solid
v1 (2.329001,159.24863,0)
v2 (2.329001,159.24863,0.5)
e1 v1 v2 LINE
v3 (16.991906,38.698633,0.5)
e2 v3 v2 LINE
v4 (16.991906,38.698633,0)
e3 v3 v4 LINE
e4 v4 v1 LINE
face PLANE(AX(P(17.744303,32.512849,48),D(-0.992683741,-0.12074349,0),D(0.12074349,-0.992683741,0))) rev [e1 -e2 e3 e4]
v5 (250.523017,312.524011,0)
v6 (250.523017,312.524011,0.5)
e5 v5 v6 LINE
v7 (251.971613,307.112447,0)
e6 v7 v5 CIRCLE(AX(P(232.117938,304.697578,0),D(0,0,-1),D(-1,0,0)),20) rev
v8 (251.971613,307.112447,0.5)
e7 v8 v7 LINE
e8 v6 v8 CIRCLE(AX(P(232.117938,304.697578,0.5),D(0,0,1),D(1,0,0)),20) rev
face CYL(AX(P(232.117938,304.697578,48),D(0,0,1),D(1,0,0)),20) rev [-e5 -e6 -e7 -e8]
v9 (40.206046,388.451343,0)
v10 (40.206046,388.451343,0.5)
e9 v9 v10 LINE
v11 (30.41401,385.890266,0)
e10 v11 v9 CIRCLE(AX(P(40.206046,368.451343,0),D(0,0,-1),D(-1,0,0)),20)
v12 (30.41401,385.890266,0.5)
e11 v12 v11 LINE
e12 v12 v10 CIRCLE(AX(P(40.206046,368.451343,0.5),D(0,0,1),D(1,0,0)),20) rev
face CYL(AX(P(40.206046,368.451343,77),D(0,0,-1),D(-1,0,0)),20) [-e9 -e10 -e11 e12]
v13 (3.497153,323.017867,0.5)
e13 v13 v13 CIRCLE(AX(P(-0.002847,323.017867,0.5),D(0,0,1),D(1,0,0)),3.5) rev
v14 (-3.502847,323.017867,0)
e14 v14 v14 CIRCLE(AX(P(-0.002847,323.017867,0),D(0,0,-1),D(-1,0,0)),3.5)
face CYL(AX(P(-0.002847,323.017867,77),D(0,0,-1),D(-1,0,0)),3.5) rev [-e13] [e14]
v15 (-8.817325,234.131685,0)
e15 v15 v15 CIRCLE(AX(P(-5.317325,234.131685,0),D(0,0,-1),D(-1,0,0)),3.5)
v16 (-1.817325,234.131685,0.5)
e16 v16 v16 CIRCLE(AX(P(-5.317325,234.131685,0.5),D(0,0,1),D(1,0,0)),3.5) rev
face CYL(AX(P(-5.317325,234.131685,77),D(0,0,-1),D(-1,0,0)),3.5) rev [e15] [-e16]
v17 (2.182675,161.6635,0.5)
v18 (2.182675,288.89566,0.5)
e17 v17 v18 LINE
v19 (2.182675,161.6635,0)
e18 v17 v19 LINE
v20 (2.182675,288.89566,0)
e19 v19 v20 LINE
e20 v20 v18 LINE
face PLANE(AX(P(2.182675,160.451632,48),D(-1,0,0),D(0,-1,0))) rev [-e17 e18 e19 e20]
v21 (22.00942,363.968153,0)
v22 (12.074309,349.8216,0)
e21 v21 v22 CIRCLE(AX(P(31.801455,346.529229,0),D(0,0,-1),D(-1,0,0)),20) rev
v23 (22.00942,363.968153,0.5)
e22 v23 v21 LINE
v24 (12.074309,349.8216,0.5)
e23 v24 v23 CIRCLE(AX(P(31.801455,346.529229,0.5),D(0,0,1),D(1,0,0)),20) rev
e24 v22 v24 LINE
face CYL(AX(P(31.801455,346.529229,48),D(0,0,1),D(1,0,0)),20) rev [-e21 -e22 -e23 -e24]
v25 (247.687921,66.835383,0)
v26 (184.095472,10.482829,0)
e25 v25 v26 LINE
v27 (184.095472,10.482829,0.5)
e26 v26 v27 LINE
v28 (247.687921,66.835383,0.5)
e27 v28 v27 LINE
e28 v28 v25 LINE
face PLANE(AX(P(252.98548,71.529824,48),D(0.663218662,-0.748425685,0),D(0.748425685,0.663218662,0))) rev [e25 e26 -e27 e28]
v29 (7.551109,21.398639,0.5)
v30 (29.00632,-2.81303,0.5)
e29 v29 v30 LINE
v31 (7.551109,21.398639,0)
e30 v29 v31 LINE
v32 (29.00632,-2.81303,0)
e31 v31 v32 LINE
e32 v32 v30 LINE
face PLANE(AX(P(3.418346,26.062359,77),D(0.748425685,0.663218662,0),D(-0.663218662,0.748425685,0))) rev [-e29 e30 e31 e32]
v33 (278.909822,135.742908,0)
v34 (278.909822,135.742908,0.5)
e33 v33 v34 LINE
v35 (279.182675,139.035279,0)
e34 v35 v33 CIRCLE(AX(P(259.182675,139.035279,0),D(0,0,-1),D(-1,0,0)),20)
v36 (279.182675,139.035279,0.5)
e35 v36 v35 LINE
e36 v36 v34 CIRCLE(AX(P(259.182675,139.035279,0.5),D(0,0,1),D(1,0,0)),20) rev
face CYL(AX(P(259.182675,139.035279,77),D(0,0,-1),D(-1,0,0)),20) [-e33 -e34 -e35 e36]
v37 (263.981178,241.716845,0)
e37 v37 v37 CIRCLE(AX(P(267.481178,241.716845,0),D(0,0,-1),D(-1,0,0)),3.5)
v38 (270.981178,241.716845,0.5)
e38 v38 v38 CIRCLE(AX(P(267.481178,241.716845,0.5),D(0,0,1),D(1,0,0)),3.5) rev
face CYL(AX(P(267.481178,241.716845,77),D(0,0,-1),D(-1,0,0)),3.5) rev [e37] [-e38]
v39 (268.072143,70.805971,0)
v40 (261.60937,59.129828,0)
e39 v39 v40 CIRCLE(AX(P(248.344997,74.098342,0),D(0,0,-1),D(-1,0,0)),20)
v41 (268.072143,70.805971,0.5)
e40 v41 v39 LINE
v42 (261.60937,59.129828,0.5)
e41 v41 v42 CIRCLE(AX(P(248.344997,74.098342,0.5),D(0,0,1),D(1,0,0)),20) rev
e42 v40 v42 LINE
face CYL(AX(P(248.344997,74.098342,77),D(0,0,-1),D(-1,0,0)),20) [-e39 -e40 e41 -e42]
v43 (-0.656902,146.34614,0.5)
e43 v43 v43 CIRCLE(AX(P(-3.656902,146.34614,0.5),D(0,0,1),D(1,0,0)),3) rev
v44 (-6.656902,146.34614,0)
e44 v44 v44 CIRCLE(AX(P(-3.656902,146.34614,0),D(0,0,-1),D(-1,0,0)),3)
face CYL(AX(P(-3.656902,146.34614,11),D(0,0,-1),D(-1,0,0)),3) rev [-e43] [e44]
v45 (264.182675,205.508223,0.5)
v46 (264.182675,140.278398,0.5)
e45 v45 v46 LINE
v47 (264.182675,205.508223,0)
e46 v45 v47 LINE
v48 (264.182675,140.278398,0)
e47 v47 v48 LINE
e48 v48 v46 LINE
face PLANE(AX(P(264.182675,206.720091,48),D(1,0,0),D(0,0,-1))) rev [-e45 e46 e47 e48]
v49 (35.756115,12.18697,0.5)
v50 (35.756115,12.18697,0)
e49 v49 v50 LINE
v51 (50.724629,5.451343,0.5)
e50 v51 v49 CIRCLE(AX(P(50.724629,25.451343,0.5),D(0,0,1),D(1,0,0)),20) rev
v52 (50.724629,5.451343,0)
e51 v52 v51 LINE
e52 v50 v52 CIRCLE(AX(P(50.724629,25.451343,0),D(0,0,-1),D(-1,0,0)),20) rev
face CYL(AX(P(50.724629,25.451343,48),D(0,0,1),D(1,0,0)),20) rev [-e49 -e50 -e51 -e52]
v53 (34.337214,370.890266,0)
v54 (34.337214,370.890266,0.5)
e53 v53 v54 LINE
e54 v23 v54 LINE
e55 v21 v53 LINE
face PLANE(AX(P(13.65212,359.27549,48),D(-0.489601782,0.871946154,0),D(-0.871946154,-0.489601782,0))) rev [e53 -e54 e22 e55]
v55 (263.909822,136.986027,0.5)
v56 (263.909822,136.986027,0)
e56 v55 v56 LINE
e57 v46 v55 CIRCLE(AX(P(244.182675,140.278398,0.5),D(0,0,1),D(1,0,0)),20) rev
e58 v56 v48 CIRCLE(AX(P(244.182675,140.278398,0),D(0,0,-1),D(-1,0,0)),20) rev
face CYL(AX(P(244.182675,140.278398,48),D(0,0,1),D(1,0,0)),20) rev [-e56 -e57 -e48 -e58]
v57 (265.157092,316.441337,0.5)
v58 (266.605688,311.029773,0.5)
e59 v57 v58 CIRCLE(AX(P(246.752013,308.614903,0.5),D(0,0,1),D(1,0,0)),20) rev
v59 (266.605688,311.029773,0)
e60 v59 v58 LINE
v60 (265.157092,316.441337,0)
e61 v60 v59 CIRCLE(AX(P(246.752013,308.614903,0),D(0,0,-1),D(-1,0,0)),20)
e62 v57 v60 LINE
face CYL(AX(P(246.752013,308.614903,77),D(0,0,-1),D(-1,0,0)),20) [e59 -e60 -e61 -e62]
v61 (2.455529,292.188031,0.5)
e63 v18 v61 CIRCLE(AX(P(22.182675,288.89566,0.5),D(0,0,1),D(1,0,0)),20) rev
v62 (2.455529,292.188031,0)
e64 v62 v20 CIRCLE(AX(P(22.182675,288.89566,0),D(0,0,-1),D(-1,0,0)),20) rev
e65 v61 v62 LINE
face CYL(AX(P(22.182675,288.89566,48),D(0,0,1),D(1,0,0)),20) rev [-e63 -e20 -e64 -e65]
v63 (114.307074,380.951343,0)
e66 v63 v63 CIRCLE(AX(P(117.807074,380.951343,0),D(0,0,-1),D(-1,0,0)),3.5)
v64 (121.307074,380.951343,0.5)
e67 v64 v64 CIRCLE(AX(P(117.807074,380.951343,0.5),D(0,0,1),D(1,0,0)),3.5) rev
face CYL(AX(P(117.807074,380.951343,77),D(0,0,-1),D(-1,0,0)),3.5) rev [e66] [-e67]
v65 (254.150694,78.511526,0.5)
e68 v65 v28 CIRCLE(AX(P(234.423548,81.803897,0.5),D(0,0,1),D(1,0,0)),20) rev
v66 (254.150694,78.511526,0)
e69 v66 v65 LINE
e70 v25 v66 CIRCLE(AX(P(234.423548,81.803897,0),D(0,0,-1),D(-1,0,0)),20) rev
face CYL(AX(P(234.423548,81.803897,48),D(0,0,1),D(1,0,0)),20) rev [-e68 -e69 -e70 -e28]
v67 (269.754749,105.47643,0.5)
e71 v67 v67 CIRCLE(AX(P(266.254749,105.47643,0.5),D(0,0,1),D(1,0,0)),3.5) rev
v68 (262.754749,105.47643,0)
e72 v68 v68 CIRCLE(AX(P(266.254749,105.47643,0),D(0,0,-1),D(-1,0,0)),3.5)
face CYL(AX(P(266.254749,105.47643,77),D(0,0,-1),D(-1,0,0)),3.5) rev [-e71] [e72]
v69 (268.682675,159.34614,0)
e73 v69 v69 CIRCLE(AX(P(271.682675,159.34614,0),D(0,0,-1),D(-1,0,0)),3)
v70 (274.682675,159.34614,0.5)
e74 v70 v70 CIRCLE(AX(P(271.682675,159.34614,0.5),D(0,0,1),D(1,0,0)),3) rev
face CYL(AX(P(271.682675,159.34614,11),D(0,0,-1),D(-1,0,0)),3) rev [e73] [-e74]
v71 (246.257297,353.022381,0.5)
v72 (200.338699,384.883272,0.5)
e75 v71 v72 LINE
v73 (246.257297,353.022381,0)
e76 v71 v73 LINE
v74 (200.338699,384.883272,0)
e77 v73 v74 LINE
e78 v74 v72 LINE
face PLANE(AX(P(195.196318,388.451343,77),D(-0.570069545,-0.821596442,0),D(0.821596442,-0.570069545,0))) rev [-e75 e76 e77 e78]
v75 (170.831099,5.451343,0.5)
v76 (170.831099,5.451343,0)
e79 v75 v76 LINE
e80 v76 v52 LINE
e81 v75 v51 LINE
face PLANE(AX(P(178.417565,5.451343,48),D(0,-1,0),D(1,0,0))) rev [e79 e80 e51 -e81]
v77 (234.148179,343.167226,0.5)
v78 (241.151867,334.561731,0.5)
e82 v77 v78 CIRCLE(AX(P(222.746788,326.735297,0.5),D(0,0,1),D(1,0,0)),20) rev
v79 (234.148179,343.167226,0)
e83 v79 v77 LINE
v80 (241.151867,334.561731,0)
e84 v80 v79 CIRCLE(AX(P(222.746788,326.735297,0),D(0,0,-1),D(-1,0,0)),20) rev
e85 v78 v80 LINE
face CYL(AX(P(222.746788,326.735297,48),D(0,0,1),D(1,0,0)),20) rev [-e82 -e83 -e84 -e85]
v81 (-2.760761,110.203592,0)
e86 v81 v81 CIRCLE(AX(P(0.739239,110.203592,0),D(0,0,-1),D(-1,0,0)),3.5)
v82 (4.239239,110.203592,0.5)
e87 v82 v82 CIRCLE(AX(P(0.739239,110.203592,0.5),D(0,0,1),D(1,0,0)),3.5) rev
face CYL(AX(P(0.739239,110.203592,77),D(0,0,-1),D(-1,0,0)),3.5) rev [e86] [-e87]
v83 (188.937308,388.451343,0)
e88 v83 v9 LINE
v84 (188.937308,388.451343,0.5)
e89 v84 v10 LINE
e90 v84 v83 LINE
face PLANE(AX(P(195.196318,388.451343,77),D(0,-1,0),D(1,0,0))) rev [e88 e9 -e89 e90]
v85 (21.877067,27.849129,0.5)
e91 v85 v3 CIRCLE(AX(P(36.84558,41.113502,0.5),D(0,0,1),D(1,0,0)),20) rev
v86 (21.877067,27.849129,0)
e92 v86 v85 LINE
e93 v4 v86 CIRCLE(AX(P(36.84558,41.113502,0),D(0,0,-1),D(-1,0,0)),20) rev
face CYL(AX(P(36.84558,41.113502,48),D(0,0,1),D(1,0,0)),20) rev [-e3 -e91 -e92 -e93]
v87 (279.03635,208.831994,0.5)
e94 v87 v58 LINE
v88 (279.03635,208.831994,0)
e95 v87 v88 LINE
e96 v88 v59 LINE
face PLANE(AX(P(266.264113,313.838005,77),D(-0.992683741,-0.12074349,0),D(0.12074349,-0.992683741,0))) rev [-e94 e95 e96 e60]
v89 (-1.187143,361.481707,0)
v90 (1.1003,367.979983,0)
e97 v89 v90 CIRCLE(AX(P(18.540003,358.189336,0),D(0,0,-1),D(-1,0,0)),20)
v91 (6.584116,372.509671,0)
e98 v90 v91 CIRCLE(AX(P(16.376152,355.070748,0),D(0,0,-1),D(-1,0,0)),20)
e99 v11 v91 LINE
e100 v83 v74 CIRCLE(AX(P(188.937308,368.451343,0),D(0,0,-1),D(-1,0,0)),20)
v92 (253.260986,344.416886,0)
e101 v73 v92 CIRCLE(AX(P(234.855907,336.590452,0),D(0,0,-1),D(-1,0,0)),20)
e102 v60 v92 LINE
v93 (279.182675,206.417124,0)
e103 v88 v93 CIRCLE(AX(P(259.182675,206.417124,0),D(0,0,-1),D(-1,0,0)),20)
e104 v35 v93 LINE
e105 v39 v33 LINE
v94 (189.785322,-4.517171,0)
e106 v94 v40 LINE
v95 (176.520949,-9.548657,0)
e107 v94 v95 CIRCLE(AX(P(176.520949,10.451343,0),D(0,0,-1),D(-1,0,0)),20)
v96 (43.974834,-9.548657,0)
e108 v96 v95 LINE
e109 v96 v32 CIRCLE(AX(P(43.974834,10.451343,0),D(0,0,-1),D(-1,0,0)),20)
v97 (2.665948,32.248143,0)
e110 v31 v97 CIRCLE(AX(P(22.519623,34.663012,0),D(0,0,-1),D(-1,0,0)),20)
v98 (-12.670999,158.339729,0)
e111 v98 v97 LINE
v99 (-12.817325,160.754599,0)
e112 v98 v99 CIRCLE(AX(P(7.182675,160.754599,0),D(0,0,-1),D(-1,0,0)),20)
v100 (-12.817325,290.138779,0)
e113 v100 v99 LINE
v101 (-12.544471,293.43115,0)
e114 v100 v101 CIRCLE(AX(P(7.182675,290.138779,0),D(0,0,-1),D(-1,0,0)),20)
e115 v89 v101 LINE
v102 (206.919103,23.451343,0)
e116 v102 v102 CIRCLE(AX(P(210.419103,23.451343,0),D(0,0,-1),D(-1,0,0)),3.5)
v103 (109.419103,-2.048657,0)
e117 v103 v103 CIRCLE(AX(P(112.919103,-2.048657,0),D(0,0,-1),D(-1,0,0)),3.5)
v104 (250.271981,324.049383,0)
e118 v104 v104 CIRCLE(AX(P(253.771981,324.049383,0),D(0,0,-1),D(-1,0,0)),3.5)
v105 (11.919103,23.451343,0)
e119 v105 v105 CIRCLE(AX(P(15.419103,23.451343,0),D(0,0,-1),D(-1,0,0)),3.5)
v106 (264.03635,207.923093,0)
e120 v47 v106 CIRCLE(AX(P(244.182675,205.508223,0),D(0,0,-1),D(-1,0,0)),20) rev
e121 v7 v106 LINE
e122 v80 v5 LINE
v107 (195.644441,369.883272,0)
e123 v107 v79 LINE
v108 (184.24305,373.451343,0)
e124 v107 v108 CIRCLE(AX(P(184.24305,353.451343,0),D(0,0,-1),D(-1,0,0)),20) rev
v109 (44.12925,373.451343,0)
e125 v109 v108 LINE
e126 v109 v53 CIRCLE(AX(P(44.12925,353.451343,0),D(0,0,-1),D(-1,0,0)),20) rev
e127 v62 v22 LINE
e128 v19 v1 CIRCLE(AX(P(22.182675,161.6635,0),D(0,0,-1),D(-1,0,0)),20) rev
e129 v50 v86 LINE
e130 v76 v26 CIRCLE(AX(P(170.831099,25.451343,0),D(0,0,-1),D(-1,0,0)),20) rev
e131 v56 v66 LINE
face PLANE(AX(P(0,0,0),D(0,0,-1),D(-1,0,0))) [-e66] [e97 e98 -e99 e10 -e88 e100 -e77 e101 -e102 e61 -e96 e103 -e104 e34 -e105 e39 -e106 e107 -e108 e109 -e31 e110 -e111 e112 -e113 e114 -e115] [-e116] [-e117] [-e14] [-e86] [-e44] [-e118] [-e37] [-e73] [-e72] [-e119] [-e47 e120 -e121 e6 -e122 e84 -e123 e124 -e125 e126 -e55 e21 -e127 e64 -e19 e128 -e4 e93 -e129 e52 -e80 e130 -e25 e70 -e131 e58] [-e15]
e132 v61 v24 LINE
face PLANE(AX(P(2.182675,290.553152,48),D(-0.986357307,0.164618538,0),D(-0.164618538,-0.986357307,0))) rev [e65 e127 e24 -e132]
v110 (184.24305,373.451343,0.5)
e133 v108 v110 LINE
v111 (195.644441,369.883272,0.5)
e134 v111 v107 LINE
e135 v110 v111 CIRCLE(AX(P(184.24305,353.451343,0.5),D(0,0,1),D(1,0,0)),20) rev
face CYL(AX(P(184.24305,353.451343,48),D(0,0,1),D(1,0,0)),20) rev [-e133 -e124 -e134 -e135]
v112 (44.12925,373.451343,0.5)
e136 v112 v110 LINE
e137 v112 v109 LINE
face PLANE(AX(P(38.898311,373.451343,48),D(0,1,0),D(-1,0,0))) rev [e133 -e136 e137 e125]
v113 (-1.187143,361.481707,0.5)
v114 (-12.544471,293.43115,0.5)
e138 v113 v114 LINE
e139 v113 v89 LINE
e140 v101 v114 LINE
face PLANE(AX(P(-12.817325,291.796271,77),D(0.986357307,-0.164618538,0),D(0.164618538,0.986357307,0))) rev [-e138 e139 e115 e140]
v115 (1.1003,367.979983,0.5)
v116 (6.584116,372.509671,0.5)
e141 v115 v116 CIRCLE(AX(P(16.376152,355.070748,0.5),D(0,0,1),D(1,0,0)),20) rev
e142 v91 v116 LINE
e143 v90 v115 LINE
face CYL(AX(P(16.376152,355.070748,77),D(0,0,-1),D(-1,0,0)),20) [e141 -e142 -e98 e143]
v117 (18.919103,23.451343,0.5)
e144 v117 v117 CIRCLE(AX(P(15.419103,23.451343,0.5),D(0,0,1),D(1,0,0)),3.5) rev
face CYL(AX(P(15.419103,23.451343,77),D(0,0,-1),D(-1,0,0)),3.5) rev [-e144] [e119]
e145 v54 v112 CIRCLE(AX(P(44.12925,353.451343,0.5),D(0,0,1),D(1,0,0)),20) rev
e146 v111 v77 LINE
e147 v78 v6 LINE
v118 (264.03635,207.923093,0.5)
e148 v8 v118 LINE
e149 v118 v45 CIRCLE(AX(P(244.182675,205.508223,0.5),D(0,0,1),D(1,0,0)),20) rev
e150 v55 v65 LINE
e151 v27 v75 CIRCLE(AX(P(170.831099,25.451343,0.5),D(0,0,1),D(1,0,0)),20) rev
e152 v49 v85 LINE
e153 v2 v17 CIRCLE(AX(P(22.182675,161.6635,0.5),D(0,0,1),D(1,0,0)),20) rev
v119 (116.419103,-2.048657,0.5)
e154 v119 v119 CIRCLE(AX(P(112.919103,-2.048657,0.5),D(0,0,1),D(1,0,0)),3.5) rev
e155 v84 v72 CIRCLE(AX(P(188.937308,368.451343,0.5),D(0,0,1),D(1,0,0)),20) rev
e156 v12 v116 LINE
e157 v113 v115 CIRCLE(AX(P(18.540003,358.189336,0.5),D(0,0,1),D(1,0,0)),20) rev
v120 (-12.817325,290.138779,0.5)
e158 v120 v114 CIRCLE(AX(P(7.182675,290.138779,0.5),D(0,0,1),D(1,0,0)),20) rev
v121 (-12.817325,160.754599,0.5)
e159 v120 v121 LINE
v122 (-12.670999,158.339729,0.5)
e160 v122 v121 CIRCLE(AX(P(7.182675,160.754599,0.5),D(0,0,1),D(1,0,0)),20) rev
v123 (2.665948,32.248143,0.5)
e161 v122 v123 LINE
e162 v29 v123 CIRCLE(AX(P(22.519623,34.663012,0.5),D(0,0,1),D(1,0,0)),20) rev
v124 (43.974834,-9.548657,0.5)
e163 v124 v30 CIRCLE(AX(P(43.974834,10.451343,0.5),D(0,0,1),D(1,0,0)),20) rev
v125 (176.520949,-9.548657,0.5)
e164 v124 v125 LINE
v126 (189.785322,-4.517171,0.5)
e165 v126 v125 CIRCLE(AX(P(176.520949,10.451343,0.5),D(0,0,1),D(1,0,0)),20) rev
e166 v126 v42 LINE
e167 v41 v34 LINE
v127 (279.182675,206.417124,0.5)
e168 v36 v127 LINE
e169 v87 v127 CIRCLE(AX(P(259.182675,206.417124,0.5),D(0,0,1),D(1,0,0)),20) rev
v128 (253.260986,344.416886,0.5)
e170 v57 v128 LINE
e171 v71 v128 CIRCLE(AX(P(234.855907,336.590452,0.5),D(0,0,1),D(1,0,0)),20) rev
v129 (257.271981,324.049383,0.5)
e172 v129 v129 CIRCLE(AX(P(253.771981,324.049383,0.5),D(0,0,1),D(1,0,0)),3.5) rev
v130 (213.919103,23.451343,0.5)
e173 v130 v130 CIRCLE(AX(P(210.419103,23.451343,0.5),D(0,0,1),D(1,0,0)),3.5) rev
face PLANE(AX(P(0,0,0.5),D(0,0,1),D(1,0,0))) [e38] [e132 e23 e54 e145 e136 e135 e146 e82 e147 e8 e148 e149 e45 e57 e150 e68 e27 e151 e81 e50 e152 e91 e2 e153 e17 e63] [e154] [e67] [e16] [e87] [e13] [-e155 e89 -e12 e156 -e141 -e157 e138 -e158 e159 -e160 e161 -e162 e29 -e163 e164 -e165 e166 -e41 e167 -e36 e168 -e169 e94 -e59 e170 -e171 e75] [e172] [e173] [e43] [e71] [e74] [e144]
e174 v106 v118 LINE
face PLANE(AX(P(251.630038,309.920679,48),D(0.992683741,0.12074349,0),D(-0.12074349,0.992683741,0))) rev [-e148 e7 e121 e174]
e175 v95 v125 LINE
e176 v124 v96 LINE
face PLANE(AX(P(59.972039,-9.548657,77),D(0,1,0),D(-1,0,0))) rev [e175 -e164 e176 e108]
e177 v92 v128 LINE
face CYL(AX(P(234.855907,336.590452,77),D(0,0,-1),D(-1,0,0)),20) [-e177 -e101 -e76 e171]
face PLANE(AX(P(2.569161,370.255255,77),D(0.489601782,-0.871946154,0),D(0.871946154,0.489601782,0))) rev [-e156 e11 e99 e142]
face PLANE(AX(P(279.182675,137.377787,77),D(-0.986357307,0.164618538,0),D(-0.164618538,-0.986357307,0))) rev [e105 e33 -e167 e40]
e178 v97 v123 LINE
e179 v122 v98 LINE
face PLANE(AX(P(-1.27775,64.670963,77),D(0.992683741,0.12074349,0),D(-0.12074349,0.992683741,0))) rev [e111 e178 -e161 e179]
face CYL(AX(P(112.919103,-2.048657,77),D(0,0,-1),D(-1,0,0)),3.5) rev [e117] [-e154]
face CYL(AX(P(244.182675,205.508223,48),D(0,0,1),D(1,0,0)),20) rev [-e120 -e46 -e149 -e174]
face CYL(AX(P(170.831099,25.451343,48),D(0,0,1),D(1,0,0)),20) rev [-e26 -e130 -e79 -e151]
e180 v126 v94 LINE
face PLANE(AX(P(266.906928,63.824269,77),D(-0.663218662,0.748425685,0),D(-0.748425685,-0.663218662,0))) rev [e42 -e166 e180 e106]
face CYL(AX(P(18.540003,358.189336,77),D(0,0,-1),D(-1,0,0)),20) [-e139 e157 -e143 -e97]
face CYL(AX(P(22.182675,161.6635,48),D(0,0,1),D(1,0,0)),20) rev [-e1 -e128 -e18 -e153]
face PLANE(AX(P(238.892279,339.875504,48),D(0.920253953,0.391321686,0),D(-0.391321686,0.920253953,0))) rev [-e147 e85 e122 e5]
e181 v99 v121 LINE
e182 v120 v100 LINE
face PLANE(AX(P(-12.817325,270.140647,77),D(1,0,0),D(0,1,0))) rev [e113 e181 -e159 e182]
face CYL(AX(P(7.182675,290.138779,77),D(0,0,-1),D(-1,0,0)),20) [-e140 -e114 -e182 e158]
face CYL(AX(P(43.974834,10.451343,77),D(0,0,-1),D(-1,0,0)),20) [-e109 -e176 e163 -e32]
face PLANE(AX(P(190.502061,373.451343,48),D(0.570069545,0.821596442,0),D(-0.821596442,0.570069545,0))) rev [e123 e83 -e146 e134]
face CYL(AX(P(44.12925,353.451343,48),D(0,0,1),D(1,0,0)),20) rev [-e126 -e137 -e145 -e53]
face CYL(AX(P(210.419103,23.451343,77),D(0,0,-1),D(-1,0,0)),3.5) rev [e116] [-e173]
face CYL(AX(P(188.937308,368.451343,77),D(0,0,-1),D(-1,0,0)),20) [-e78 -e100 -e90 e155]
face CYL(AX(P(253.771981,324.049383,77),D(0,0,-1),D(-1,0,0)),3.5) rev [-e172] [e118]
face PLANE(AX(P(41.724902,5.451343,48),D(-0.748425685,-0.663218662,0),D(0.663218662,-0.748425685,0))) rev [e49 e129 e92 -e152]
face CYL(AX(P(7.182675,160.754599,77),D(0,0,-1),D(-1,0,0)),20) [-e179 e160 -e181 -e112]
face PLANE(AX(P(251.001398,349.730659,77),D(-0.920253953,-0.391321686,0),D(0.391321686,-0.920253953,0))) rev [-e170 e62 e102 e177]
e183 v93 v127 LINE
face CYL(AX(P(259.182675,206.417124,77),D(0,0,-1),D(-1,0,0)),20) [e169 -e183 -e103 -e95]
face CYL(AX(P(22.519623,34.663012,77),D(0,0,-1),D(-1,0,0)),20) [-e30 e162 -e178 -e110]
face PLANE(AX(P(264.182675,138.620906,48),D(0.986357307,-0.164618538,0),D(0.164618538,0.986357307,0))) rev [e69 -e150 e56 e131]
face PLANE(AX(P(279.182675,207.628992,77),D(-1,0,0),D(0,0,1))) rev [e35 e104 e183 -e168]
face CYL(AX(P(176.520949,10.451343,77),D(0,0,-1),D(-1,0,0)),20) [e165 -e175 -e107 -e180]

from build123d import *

# Parameters (mm, degrees)
ESTRUSIONE_ESTRUSIONE1_DEPTH         = 77
SCHIZZO2_R                           = 50
SCHIZZO2_R_2                         = 36
SCHIZZO2_R_3                         = 26
TAGLIO_ESTRUSIONE1_DEPTH             = 485.526998211
TAGLIO_ESTRUSIONE2_DEPTH             = 48
FORO_FILETTATO_M8_1_D                = 6.8
FORO_FILETTATO_M8_1_DEPTH            = 23
FORO_FILETTATO_M8_1_CSINK_D          = 8.05
FORO_FILETTATO_M8_1_CSINK_ANGLE      = 90
FORO_FILETTATO_M8_1_TIP              = 2.042926105
SCHIZZO10_R                          = 3.5
TAGLIO_ESTRUSIONE3_DEPTH             = 485.526998211
RACCORDO1_R                          = 20
RACCORDO2_R                          = 2
ESTRUSIONE_ESTRUSIONE2_START         = -4.5
SCHIZZO11_R                          = 50
SCHIZZO11_R_2                        = 43
ESTRUSIONE_ESTRUSIONE2_DEPTH         = 4.5
ESTRUSIONE_ESTRUSIONE4_START         = 5
SCHIZZO12_R                          = 33.5
ESTRUSIONE_ESTRUSIONE4_DEPTH         = 6
ESTRUSIONE_ESTRUSIONE5_START         = -4
SCHIZZO13_R                          = 26
SCHIZZO13_R_2                        = 23
ESTRUSIONE_ESTRUSIONE5_DEPTH         = 4
SCHIZZO15_R                          = 3
TAGLIO_ESTRUSIONE4_DEPTH             = 11
RACCORDO4_R                          = 20
FORO_FILETTATO_M20X1_5_1_D           = 18.5
FORO_FILETTATO_M20X1_5_1_DEPTH       = 44.5
FORO_FILETTATO_M20X1_5_1_CSINK_D     = 20.05
FORO_FILETTATO_M20X1_5_1_CSINK_ANGLE = 90
FORO_FILETTATO_M20X1_5_1_TIP         = 5.557960726
FORO_FILETTATO_G1_2_1_D              = 19
FORO_FILETTATO_G1_2_1_DEPTH          = 15
FORO_FILETTATO_G1_2_1_CSINK_D        = 21.005
FORO_FILETTATO_G1_2_1_CSINK_ANGLE    = 90
FORO_FILETTATO_M20X1_5_3_D           = 18.5
FORO_FILETTATO_M20X1_5_3_CSINK_D     = 20.05
FORO_FILETTATO_M20X1_5_3_CSINK_ANGLE = 90
RACCORDO6_R                          = 4
SCHIZZO24_W                          = 424.699843927
SCHIZZO24_H                          = 472.863672624
TAGLIO_ESTRUSIONE8_DEPTH             = 76.5


with BuildPart() as part:
    # Schizzo1 → Estrusione-Estrusione1 (new body)
    with BuildSketch(Plane.XY):
        Polygon((59.972038663, -9.548657155), (184.107415497, -9.548657155), (266.906928499, 63.824268584), (279.182675389, 137.377787042), (279.182675389, 207.628992193), (266.264112981, 313.83800459), (251.001397802, 349.730658864), (195.196318474, 388.451342845), (34.975107006, 388.451342845), (2.569160579, 370.255254654), (-0.4487972, 365.905709245), (-12.817324611, 291.796270746), (-12.817324611, 270.140647245), (-12.817324611, 159.542730711), (-8.096788353, 120.733188436), (-1.277749696, 64.670962751), (3.418345685, 26.062359347), (34.975107006, -9.548657155), align=None)
    extrude(amount=ESTRUSIONE_ESTRUSIONE1_DEPTH)

    # Schizzo2 → Taglio-Estrusione1 (cut, through all)
    with BuildSketch(Plane.XY.offset(77)):
        with Locations((119.182675389, 251.951342845)):
            Circle(SCHIZZO2_R)
        with Locations((227.185755277, 174.346140283)):
            Circle(SCHIZZO2_R_2)
        with Locations((119.182675389, 109.451342845)):
            Circle(SCHIZZO2_R_3)
    extrude(amount=-TAGLIO_ESTRUSIONE1_DEPTH, mode=Mode.SUBTRACT)

    # Schizzo4 → Taglio-Estrusione2 (cut)
    with BuildSketch(Plane(origin=(0, 0, 0), x_dir=(-1, 0, 0), z_dir=(0, 0, -1))):
        Polygon((-190.502060744, 373.451342845), (-238.892279388, 339.875503756), (-251.63003789, 309.920678761), (-264.182675389, 206.720091138), (-264.182675389, 138.620905818), (-252.98547965, 71.529823638), (-178.417565472, 5.451342845), (-41.724902169, 5.451342845), (-17.744303444, 32.512849195), (-2.182675389, 160.451631766), (-2.182675389, 290.55315197), (-13.652120373, 359.275490486), (-38.898311054, 373.451342845), align=None)
    extrude(amount=-TAGLIO_ESTRUSIONE2_DEPTH, mode=Mode.SUBTRACT)

    # Foro filettato M8-1
    with Locations(Plane(origin=(119.182675389, 309.951342845, 77), x_dir=(1, 0, 0), z_dir=(0, 0, 1))):
        with Locations((0, 0), (-50.22947342, -87), (50.229473419, -87), (63.003079888, -135.605202562), (130.503079888, -96.634059392), (130.503079888, -174.576345732), (0, -165.5), (-30.310889133, -218), (30.310889132, -218)):
            CounterSinkHole(FORO_FILETTATO_M8_1_D / 2, FORO_FILETTATO_M8_1_CSINK_D / 2, depth=FORO_FILETTATO_M8_1_DEPTH, counter_sink_angle=FORO_FILETTATO_M8_1_CSINK_ANGLE)
            with Locations((0, 0, -(FORO_FILETTATO_M8_1_DEPTH + FORO_FILETTATO_M8_1_TIP / 2))):  # 118° drill point
                Cone(0, FORO_FILETTATO_M8_1_D / 2, FORO_FILETTATO_M8_1_TIP, mode=Mode.SUBTRACT)

    # Schizzo10 → Taglio-Estrusione3 (cut, through all)
    with BuildSketch(Plane(origin=(0, 0, 0), x_dir=(-1, 0, 0), z_dir=(0, 0, -1))):
        with Locations((-117.807073551, 380.951342845)):
            Circle(SCHIZZO10_R)
        with Locations((-253.771981004, 324.049383053)):
            Circle(SCHIZZO10_R)
        with Locations((5.317324611, 234.131684501)):
            Circle(SCHIZZO10_R)
        with Locations((-266.254748996, 105.476430494)):
            Circle(SCHIZZO10_R)
        with Locations((-0.739238535, 110.203591991)):
            Circle(SCHIZZO10_R)
        with Locations((-112.919102804, -2.048657155)):
            Circle(SCHIZZO10_R)
        with Locations((0.002847066, 323.017867274)):
            Circle(SCHIZZO10_R)
        with Locations((-267.481177866, 241.716845092)):
            Circle(SCHIZZO10_R)
        with Locations((-210.419102804, 23.451342845)):
            Circle(SCHIZZO10_R)
        with Locations((-15.419102804, 23.451342845)):
            Circle(SCHIZZO10_R)
    extrude(amount=-TAGLIO_ESTRUSIONE3_DEPTH, mode=Mode.SUBTRACT)

    # Raccordo1
    # the kernel refuses this fillet: 20 mm, written as the material it takes off along each edge
    with BuildSketch(Plane(origin=(34.975107006, 388.451342845, -13.077346825), x_dir=(1, 0, 0), z_dir=(0, 0, 1))) as raccordo1_piece_1:
        with BuildLine():
            CenterArc((RACCORDO1_R * 0.261546936495, -RACCORDO1_R), RACCORDO1_R, 90, 29.314411212)
            Line((-RACCORDO1_R * 0.228054845331, -RACCORDO1_R * 0.128053846139), (0, 0))
            Line((0, 0), (RACCORDO1_R * 0.261546936495, 0))
        make_face()
    extrude(amount=103.15469365, mode=Mode.SUBTRACT)
    with BuildSketch(Plane(origin=(2.569160579, 370.255254654, -11.511478705), x_dir=(-0.5700695452044089, -0.821596442075085, 0), z_dir=(0, 0, 1))) as raccordo1_piece_2:
        with BuildLine():
            CenterArc((RACCORDO1_R * 0.230229574105, RACCORDO1_R), RACCORDO1_R, 244.069486706, 25.930513294)
            Line((-RACCORDO1_R * 0.207051218491, RACCORDO1_R * 0.100674970644), (0, 0))
            Line((0, 0), (RACCORDO1_R * 0.230229574105, 0))
        make_face()
    extrude(amount=100.022957411, mode=Mode.SUBTRACT)
    with BuildSketch(Plane(origin=(-0.4487972, 365.905709245, -11.212980636), x_dir=(-0.1646185376039717, -0.9863573070024523, 0), z_dir=(0, 0, 1))) as raccordo1_piece_3:
        with BuildLine():
            CenterArc((RACCORDO1_R * 0.224259612729, RACCORDO1_R), RACCORDO1_R, 244.719999772, 25.280000228)
            Line((-RACCORDO1_R * 0.202782643888, RACCORDO1_R * 0.0957683310879), (0, 0))
            Line((0, 0), (RACCORDO1_R * 0.224259612729, 0))
        make_face()
    extrude(amount=99.425961273, mode=Mode.SUBTRACT)
    with BuildSketch(Plane(origin=(-12.817324611, 291.796270746, -4.143729253), x_dir=(0, -1, 0), z_dir=(0, 0, 1))) as raccordo1_piece_4:
        with BuildLine():
            CenterArc((RACCORDO1_R * 0.0828745850626, RACCORDO1_R), RACCORDO1_R, 260.524924734, 9.475075266)
            Line((-RACCORDO1_R * 0.0817439525413, RACCORDO1_R * 0.0136426929975), (0, 0))
            Line((0, 0), (RACCORDO1_R * 0.0828745850626, 0))
        make_face()
    extrude(amount=85.287458506, mode=Mode.SUBTRACT)
    with BuildSketch(Plane(origin=(-12.817324611, 159.542730711, -3.029670184), x_dir=(0.12074349030746913, -0.9926837409509486, 0), z_dir=(0, 0, 1))) as raccordo1_piece_5:
        with BuildLine():
            CenterArc((RACCORDO1_R * 0.0605934036727, RACCORDO1_R), RACCORDO1_R, 263.064986553, 6.935013447)
            Line((-RACCORDO1_R * 0.0601500866348, RACCORDO1_R * 0.00731625904905), (0, 0))
            Line((0, 0), (RACCORDO1_R * 0.0605934036727, 0))
        make_face()
    extrude(amount=83.059340367, mode=Mode.SUBTRACT)
    with BuildSketch(Plane(origin=(3.418345685, 26.062359347, -15.578434173), x_dir=(0.6632186619985212, -0.7484256852733552, 0), z_dir=(0, 0, 1))) as raccordo1_piece_6:
        with BuildLine():
            CenterArc((RACCORDO1_R * 0.311568683461, RACCORDO1_R), RACCORDO1_R, 235.389202752, 34.610797248)
            Line((-RACCORDO1_R * 0.256430169524, RACCORDO1_R * 0.176970654832), (0, 0))
            Line((0, 0), (RACCORDO1_R * 0.311568683461, 0))
        make_face()
    extrude(amount=108.156868346, mode=Mode.SUBTRACT)
    with BuildSketch(Plane(origin=(34.975107006, -9.548657155, -22.499317209), x_dir=(1, 0, 0), z_dir=(0, 0, 1))) as raccordo1_piece_7:
        with BuildLine():
            CenterArc((RACCORDO1_R * 0.449986344173, RACCORDO1_R), RACCORDO1_R, 221.545810695, 48.454189305)
            Line((-RACCORDO1_R * 0.2984393411, RACCORDO1_R * 0.336781338001), (0, 0))
            Line((0, 0), (RACCORDO1_R * 0.449986344173, 0))
        make_face()
    extrude(amount=121.998634417, mode=Mode.SUBTRACT)
    with BuildSketch(Plane(origin=(184.107415497, -9.548657155, -18.966166752), x_dir=(-1, 0, 0), z_dir=(0, 0, 1))) as raccordo1_piece_8:
        with BuildLine():
            CenterArc((RACCORDO1_R * 0.379323335035, -RACCORDO1_R), RACCORDO1_R, 90, 41.545810695)
            Line((-RACCORDO1_R * 0.283895326964, -RACCORDO1_R * 0.251574314727), (0, 0))
            Line((0, 0), (RACCORDO1_R * 0.379323335035, 0))
        make_face()
    extrude(amount=114.932333503, mode=Mode.SUBTRACT)
    with BuildSketch(Plane(origin=(266.906928499, 63.824268584, -17.695673271), x_dir=(-0.7484256852733557, -0.6632186619985205, 0), z_dir=(0, 0, 1))) as raccordo1_piece_9:
        with BuildLine():
            CenterArc((RACCORDO1_R * 0.353913465424, -RACCORDO1_R), RACCORDO1_R, 90, 38.979114039)
            Line((-RACCORDO1_R * 0.275123591744, -RACCORDO1_R * 0.222624684782), (0, 0))
            Line((0, 0), (RACCORDO1_R * 0.353913465424, 0))
        make_face()
    extrude(amount=112.391346542, mode=Mode.SUBTRACT)
    with BuildSketch(Plane(origin=(279.182675389, 137.377787042, -4.143729253), x_dir=(-0.1646185376039625, -0.9863573070024537, 0), z_dir=(0, 0, 1))) as raccordo1_piece_10:
        with BuildLine():
            CenterArc((RACCORDO1_R * 0.0828745850626, -RACCORDO1_R), RACCORDO1_R, 90, 9.475075266)
            Line((-RACCORDO1_R * 0.0817439525413, -RACCORDO1_R * 0.0136426929975), (0, 0))
            Line((0, 0), (RACCORDO1_R * 0.0828745850626, 0))
        make_face()
    extrude(amount=85.287458506, mode=Mode.SUBTRACT)
    with BuildSketch(Plane(origin=(279.182675389, 207.628992193, -3.029670184), x_dir=(0, -1, 0), z_dir=(0, 0, 1))) as raccordo1_piece_11:
        with BuildLine():
            CenterArc((RACCORDO1_R * 0.0605934036727, -RACCORDO1_R), RACCORDO1_R, 90, 6.935013447)
            Line((-RACCORDO1_R * 0.0601500866348, -RACCORDO1_R * 0.00731625904905), (0, 0))
            Line((0, 0), (RACCORDO1_R * 0.0605934036727, 0))
        make_face()
    extrude(amount=83.059340367, mode=Mode.SUBTRACT)
    with BuildSketch(Plane(origin=(266.264112981, 313.83800459, -7.072321183), x_dir=(0.12074349030746688, -0.9926837409509489, 0), z_dir=(0, 0, 1))) as raccordo1_piece_12:
        with BuildLine():
            CenterArc((RACCORDO1_R * 0.141446423652, -RACCORDO1_R), RACCORDO1_R, 90, 16.101750132)
            Line((-RACCORDO1_R * 0.135897577057, -RACCORDO1_R * 0.0392293170219), (0, 0))
            Line((0, 0), (RACCORDO1_R * 0.141446423652, 0))
        make_face()
    extrude(amount=91.144642365, mode=Mode.SUBTRACT)
    with BuildSketch(Plane(origin=(251.001397802, 349.730658864, -14.435616051), x_dir=(0.39132168580287185, -0.9202539531131602, 0), z_dir=(0, 0, 1))) as raccordo1_piece_13:
        with BuildLine():
            CenterArc((RACCORDO1_R * 0.288712321022, -RACCORDO1_R), RACCORDO1_R, 90, 32.208160927)
            Line((-RACCORDO1_R * 0.244284477207, -RACCORDO1_R * 0.153882742714), (0, 0))
            Line((0, 0), (RACCORDO1_R * 0.288712321022, 0))
        make_face()
    extrude(amount=105.871232102, mode=Mode.SUBTRACT)
    with BuildSketch(Plane(origin=(195.196318474, 388.451342845, -15.647525765), x_dir=(0.8215964420750854, -0.570069545204408, 0), z_dir=(0, 0, 1))) as raccordo1_piece_14:
        with BuildLine():
            CenterArc((RACCORDO1_R * 0.312950515294, -RACCORDO1_R), RACCORDO1_R, 90, 34.755075494)
            Line((-RACCORDO1_R * 0.257119029911, -RACCORDO1_R * 0.178403557925), (0, 0))
            Line((0, 0), (RACCORDO1_R * 0.312950515294, 0))
        make_face()
    extrude(amount=108.295051529, mode=Mode.SUBTRACT)

    # Raccordo2
    # the kernel refuses this fillet: 2 mm, written as the material it takes off along each edge
    with BuildSketch(Plane(origin=(30.414010099, 385.890265922, 77), x_dir=(0.48960178182599706, -0.8719461538608957, 0), z_dir=(-0.8719461538608957, -0.48960178182599706, 0))) as raccordo2_piece_1:
        with BuildLine():
            CenterArc((RACCORDO2_R, -RACCORDO2_R), RACCORDO2_R, 90, 90)
            Line((0, -RACCORDO2_R), (0, 0))
            Line((0, 0), (RACCORDO2_R, 0))
        make_face()
    extrude(amount=27.329547338, mode=Mode.SUBTRACT)
    with BuildSketch(Plane(origin=(188.937308168, 388.451342845, 77), x_dir=(0, -1, 0), z_dir=(-1, 0, 0))) as raccordo2_piece_2:
        with BuildLine():
            CenterArc((RACCORDO2_R, -RACCORDO2_R), RACCORDO2_R, 90, 90)
            Line((0, -RACCORDO2_R), (0, 0))
            Line((0, 0), (RACCORDO2_R, 0))
        make_face()
    extrude(amount=148.731262432, mode=Mode.SUBTRACT)
    with BuildSketch(Plane(origin=(176.520948797, -9.548657155, 77), x_dir=(0, 0, -1), z_dir=(-1, 0, 0))) as raccordo2_piece_3:
        with BuildLine():
            CenterArc((RACCORDO2_R, -RACCORDO2_R), RACCORDO2_R, 90, 90)
            Line((0, -RACCORDO2_R), (0, 0))
            Line((0, 0), (RACCORDO2_R, 0))
        make_face()
    extrude(amount=132.546114907, mode=Mode.SUBTRACT)
    with BuildSketch(Plane(origin=(189.785322037, -4.517170861, 77), x_dir=(-0.663218661998521, 0.7484256852733554, 0), z_dir=(0.7484256852733554, 0.663218661998521, 0))) as raccordo2_piece_4:
        with BuildLine():
            CenterArc((RACCORDO2_R, -RACCORDO2_R), RACCORDO2_R, 90, 90)
            Line((0, -RACCORDO2_R), (0, 0))
            Line((0, 0), (RACCORDO2_R, 0))
        make_face()
    extrude(amount=95.966839884, mode=Mode.SUBTRACT)
    with BuildSketch(Plane(origin=(268.072142841, 70.805971237, 77), x_dir=(-0.9863573070024519, 0.16461853760397313, 0), z_dir=(0.16461853760397316, 0.986357307002452, 0))) as raccordo2_piece_5:
        with BuildLine():
            CenterArc((RACCORDO2_R, -RACCORDO2_R), RACCORDO2_R, 90, 90)
            Line((0, -RACCORDO2_R), (0, 0))
            Line((0, 0), (RACCORDO2_R, 0))
        make_face()
    extrude(amount=65.835104879, mode=Mode.SUBTRACT)
    with BuildSketch(Plane(origin=(279.182675389, 139.035278743, 77), x_dir=(-1, 0, 0), z_dir=(0, 1, 0))) as raccordo2_piece_6:
        with BuildLine():
            CenterArc((RACCORDO2_R, -RACCORDO2_R), RACCORDO2_R, 90, 90)
            Line((0, -RACCORDO2_R), (0, 0))
            Line((0, 0), (RACCORDO2_R, 0))
        make_face()
    extrude(amount=67.381845376, mode=Mode.SUBTRACT)
    with BuildSketch(Plane(origin=(279.036350208, 208.831993925, 77), x_dir=(-0.9926837409509485, -0.12074349030747052, 0), z_dir=(-0.12074349030747053, 0.9926837409509486, 0))) as raccordo2_piece_7:
        with BuildLine():
            CenterArc((RACCORDO2_R, -RACCORDO2_R), RACCORDO2_R, 90, 90)
            Line((0, -RACCORDO2_R), (0, 0))
            Line((0, 0), (RACCORDO2_R, 0))
        make_face()
    extrude(amount=102.950995518, mode=Mode.SUBTRACT)
    with BuildSketch(Plane(origin=(265.157091922, 316.441337201, 77), x_dir=(-0.9202539531131583, -0.3913216858028763, 0), z_dir=(-0.3913216858028763, 0.9202539531131584, 0))) as raccordo2_piece_8:
        with BuildLine():
            CenterArc((RACCORDO2_R, -RACCORDO2_R), RACCORDO2_R, 90, 90)
            Line((0, -RACCORDO2_R), (0, 0))
            Line((0, 0), (RACCORDO2_R, 0))
        make_face()
    extrude(amount=30.399813524, mode=Mode.SUBTRACT)
    with BuildSketch(Plane(origin=(246.257297487, 353.022380895, 77), x_dir=(-0.5700695452044079, -0.8215964420750858, 0), z_dir=(-0.8215964420750858, 0.5700695452044079, 0))) as raccordo2_piece_9:
        with BuildLine():
            CenterArc((RACCORDO2_R, -RACCORDO2_R), RACCORDO2_R, 90, 90)
            Line((0, -RACCORDO2_R), (0, 0))
            Line((0, 0), (RACCORDO2_R, 0))
        make_face()
    extrude(amount=55.889480606, mode=Mode.SUBTRACT)
    with BuildSketch(Plane(origin=(-1.18714299, 361.481707091, 77), x_dir=(0.9863573070024522, -0.16461853760397252, 0), z_dir=(-0.16461853760397252, -0.9863573070024522, 0))) as raccordo2_piece_10:
        with BuildLine():
            CenterArc((RACCORDO2_R, -RACCORDO2_R), RACCORDO2_R, 90, 90)
            Line((0, -RACCORDO2_R), (0, 0))
            Line((0, 0), (RACCORDO2_R, 0))
        make_face()
    extrude(amount=68.99179112, mode=Mode.SUBTRACT)
    with BuildSketch(Plane(origin=(-12.817324611, 160.754598785, 77), x_dir=(1, 0, 0), z_dir=(0, 1, 0))) as raccordo2_piece_11:
        with BuildLine():
            CenterArc((RACCORDO2_R, RACCORDO2_R), RACCORDO2_R, 180, 90)
            Line((0, RACCORDO2_R), (0, 0))
            Line((0, 0), (RACCORDO2_R, 0))
        make_face()
    extrude(amount=129.38418026, mode=Mode.SUBTRACT)
    with BuildSketch(Plane(origin=(2.665947879, 32.248142672, 77), x_dir=(0.9926837409509485, 0.12074349030747038, 0), z_dir=(-0.12074349030747038, 0.9926837409509485, 0))) as raccordo2_piece_12:
        with BuildLine():
            CenterArc((RACCORDO2_R, RACCORDO2_R), RACCORDO2_R, 180, 90)
            Line((0, RACCORDO2_R), (0, 0))
            Line((0, 0), (RACCORDO2_R, 0))
        make_face()
    extrude(amount=127.020904146, mode=Mode.SUBTRACT)
    with BuildSketch(Plane(origin=(7.551108992, 21.398639238, 77), x_dir=(0.7484256852733555, 0.6632186619985208, 0), z_dir=(0.6632186619985209, -0.7484256852733556, 0))) as raccordo2_piece_13:
        with BuildLine():
            CenterArc((RACCORDO2_R, -RACCORDO2_R), RACCORDO2_R, 90, 90)
            Line((0, -RACCORDO2_R), (0, 0))
            Line((0, 0), (RACCORDO2_R, 0))
        make_face()
    extrude(amount=32.350131897, mode=Mode.SUBTRACT)
    with BuildSketch(Plane(origin=(188.937308168, 368.451342845, 77), x_dir=(0, 1, 0), z_dir=(-1, 0, 0))) as raccordo2_piece_14:
        with BuildLine():
            CenterArc((20 - RACCORDO2_R, RACCORDO2_R), RACCORDO2_R, 270, 90)
            Line((20, RACCORDO2_R), (20, 0))
            Line((20, 0), (20 - RACCORDO2_R, 0))
        make_face()
    revolve(axis=Axis((188.937308168, 368.451342845, 77), (0, 0, -1)), revolution_arc=34.755075494, mode=Mode.SUBTRACT)
    with BuildSketch(Plane(origin=(234.855906583, 336.590452054, 77), x_dir=(0.570069545204261, 0.8215964420751876, 0), z_dir=(-0.8215964420751876, 0.570069545204261, 0))) as raccordo2_piece_15:
        with BuildLine():
            CenterArc((20 - RACCORDO2_R, RACCORDO2_R), RACCORDO2_R, 270, 90)
            Line((20, RACCORDO2_R), (20, 0))
            Line((20, 0), (20 - RACCORDO2_R, 0))
        make_face()
    revolve(axis=Axis((234.855906583, 336.590452054, 77), (0, 0, -1)), revolution_arc=32.208160927, mode=Mode.SUBTRACT)
    with BuildSketch(Plane(origin=(246.752012859, 308.614903485, 77), x_dir=(0.9202539531133431, 0.39132168580244153, 0), z_dir=(-0.39132168580244153, 0.9202539531133431, 0))) as raccordo2_piece_16:
        with BuildLine():
            CenterArc((20 - RACCORDO2_R, RACCORDO2_R), RACCORDO2_R, 270, 90)
            Line((20, RACCORDO2_R), (20, 0))
            Line((20, 0), (20 - RACCORDO2_R, 0))
        make_face()
    revolve(axis=Axis((246.752012859, 308.614903485, 77), (0, 0, -1)), revolution_arc=16.101750132, mode=Mode.SUBTRACT)
    with BuildSketch(Plane(origin=(259.182675389, 206.417124119, 77), x_dir=(0.9926837409509487, 0.12074349030746842, 0), z_dir=(-0.12074349030746842, 0.9926837409509487, 0))) as raccordo2_piece_17:
        with BuildLine():
            CenterArc((20 - RACCORDO2_R, RACCORDO2_R), RACCORDO2_R, 270, 90)
            Line((20, RACCORDO2_R), (20, 0))
            Line((20, 0), (20 - RACCORDO2_R, 0))
        make_face()
    revolve(axis=Axis((259.182675389, 206.417124119, 77), (0, 0, -1)), revolution_arc=6.935013447, mode=Mode.SUBTRACT)
    with BuildSketch(Plane(origin=(259.182675389, 139.035278743, 77), x_dir=(1, 0, 0), z_dir=(0, 1, 0))) as raccordo2_piece_18:
        with BuildLine():
            CenterArc((20 - RACCORDO2_R, RACCORDO2_R), RACCORDO2_R, 270, 90)
            Line((20, RACCORDO2_R), (20, 0))
            Line((20, 0), (20 - RACCORDO2_R, 0))
        make_face()
    revolve(axis=Axis((259.182675389, 139.035278743, 77), (0, 0, -1)), revolution_arc=9.475075266, mode=Mode.SUBTRACT)
    with BuildSketch(Plane(origin=(248.344996701, 74.098341989, 77), x_dir=(0.9863573070025499, -0.16461853760338632, 0), z_dir=(0.16461853760338632, 0.9863573070025499, 0))) as raccordo2_piece_19:
        with BuildLine():
            CenterArc((20 - RACCORDO2_R, RACCORDO2_R), RACCORDO2_R, 270, 90)
            Line((20, RACCORDO2_R), (20, 0))
            Line((20, 0), (20 - RACCORDO2_R, 0))
        make_face()
    revolve(axis=Axis((248.344996701, 74.098341989, 77), (0, 0, -1)), revolution_arc=38.979114039, mode=Mode.SUBTRACT)
    with BuildSketch(Plane(origin=(176.520948797, 10.451342845, 77), x_dir=(0.6632186619985235, -0.7484256852733531, 0), z_dir=(0.7484256852733531, 0.6632186619985235, 0))) as raccordo2_piece_20:
        with BuildLine():
            CenterArc((20 - RACCORDO2_R, RACCORDO2_R), RACCORDO2_R, 270, 90)
            Line((20 - RACCORDO2_R, 0), (20, 0))
            Line((20, 0), (20, RACCORDO2_R))
        make_face()
    revolve(axis=Axis((176.520948797, 10.451342845, 77), (0, 0, -1)), revolution_arc=41.545810695, mode=Mode.SUBTRACT)
    with BuildSketch(Plane(origin=(43.97483389, 10.451342845, 77), x_dir=(0, -1, 0), z_dir=(1, 0, 0))) as raccordo2_piece_21:
        with BuildLine():
            CenterArc((20 - RACCORDO2_R, RACCORDO2_R), RACCORDO2_R, 270, 90)
            Line((20, RACCORDO2_R), (20, 0))
            Line((20, 0), (20 - RACCORDO2_R, 0))
        make_face()
    revolve(axis=Axis((43.97483389, 10.451342845, 77), (0, 0, -1)), revolution_arc=48.454189305, mode=Mode.SUBTRACT)
    with BuildSketch(Plane(origin=(22.519622698, 34.663012478, 77), x_dir=(-0.7484256852729614, -0.6632186619989657, 0), z_dir=(0.6632186619989657, -0.7484256852729614, 0))) as raccordo2_piece_22:
        with BuildLine():
            CenterArc((20 - RACCORDO2_R, RACCORDO2_R), RACCORDO2_R, 270, 90)
            Line((20, RACCORDO2_R), (20, 0))
            Line((20, 0), (20 - RACCORDO2_R, 0))
        make_face()
    revolve(axis=Axis((22.519622698, 34.663012478, 77), (0, 0, -1)), revolution_arc=34.610797248, mode=Mode.SUBTRACT)
    with BuildSketch(Plane(origin=(7.182675389, 160.754598785, 77), x_dir=(-0.9926837409510056, -0.1207434903070009, 0), z_dir=(0.1207434903070009, -0.9926837409510056, 0))) as raccordo2_piece_23:
        with BuildLine():
            CenterArc((20 - RACCORDO2_R, RACCORDO2_R), RACCORDO2_R, 270, 90)
            Line((20, RACCORDO2_R), (20, 0))
            Line((20, 0), (20 - RACCORDO2_R, 0))
        make_face()
    revolve(axis=Axis((7.182675389, 160.754598785, 77), (0, 0, -1)), revolution_arc=6.935013447, mode=Mode.SUBTRACT)
    with BuildSketch(Plane(origin=(7.182675389, 290.138779045, 77), x_dir=(-1, 0, 0), z_dir=(0, -1, 0))) as raccordo2_piece_24:
        with BuildLine():
            CenterArc((20 - RACCORDO2_R, RACCORDO2_R), RACCORDO2_R, 270, 90)
            Line((20, RACCORDO2_R), (20, 0))
            Line((20, 0), (20 - RACCORDO2_R, 0))
        make_face()
    revolve(axis=Axis((7.182675389, 290.138779045, 77), (0, 0, -1)), revolution_arc=9.475075266, mode=Mode.SUBTRACT)
    with BuildSketch(Plane(origin=(18.54000315, 358.189336339, 77), x_dir=(-0.9863573070024353, 0.16461853760407336, 0), z_dir=(-0.16461853760407336, -0.9863573070024353, 0))) as raccordo2_piece_25:
        with BuildLine():
            CenterArc((20 - RACCORDO2_R, RACCORDO2_R), RACCORDO2_R, 270, 90)
            Line((20, RACCORDO2_R), (20, 0))
            Line((20, 0), (20 - RACCORDO2_R, 0))
        make_face()
    revolve(axis=Axis((18.54000315, 358.189336339, 77), (0, 0, -1)), revolution_arc=34.158995702, mode=Mode.SUBTRACT)
    with BuildSketch(Plane(origin=(16.376152048, 355.070747771, 77), x_dir=(-0.8997401995027494, 0.4364259082579227, 0), z_dir=(-0.4364259082579227, -0.8997401995027494, 0))) as raccordo2_piece_26:
        with BuildLine():
            CenterArc((20 - RACCORDO2_R, RACCORDO2_R), RACCORDO2_R, 270, 90)
            Line((20, RACCORDO2_R), (20, 0))
            Line((20, 0), (20 - RACCORDO2_R, 0))
        make_face()
    revolve(axis=Axis((16.376152048, 355.070747771, 77), (0, 0, -1)), revolution_arc=34.809527395, mode=Mode.SUBTRACT)
    with BuildSketch(Plane(origin=(40.206045736, 368.451342845, 77), x_dir=(-0.4896017818259922, 0.8719461538608984, 0), z_dir=(-0.8719461538608984, -0.4896017818259922, 0))) as raccordo2_piece_27:
        with BuildLine():
            CenterArc((20 - RACCORDO2_R, RACCORDO2_R), RACCORDO2_R, 270, 90)
            Line((20, RACCORDO2_R), (20, 0))
            Line((20, 0), (20 - RACCORDO2_R, 0))
        make_face()
    revolve(axis=Axis((40.206045736, 368.451342845, 77), (0, 0, -1)), revolution_arc=29.314411212, mode=Mode.SUBTRACT)

    # Schizzo11 → Estrusione-Estrusione2 (add)
    with BuildSketch(Plane(origin=(0, 0, 48), x_dir=(-1, 0, 0), z_dir=(0, 0, -1)).offset(ESTRUSIONE_ESTRUSIONE2_START)):
        with Locations(Location((-119.182675389, 251.951342845, 0), (0, 0, 180))):
            Circle(SCHIZZO11_R)
        with Locations((-119.182675389, 251.951342845)):
            Circle(SCHIZZO11_R_2, mode=Mode.SUBTRACT)
    extrude(amount=ESTRUSIONE_ESTRUSIONE2_DEPTH)

    # Schizzo12 → Estrusione-Estrusione4 (add)
    with BuildSketch(Plane(origin=(0, 0, 48), x_dir=(-1, 0, 0), z_dir=(0, 0, -1)).offset(ESTRUSIONE_ESTRUSIONE4_START)):
        with BuildLine():
            Line((-267.185755277, 219.346140283), (-227.185755277, 219.346140283))
            ThreePointArc((-227.185755277, 219.346140283), (-182.185755277, 174.346140283), (-227.185755277, 129.346140283))
            Line((-227.185755277, 129.346140283), (-267.185755277, 129.346140283))
            Line((-267.185755277, 129.346140283), (-265.474250546, 179.346140283))
            Line((-265.474250546, 179.346140283), (-267.185755277, 219.346140283))
        make_face()
        with Locations((-227.185755277, 174.346140283)):
            Circle(SCHIZZO12_R, mode=Mode.SUBTRACT)
    extrude(amount=-ESTRUSIONE_ESTRUSIONE4_DEPTH)

    # Schizzo13 → Estrusione-Estrusione5 (add)
    with BuildSketch(Plane(origin=(0, 0, 48), x_dir=(-1, 0, 0), z_dir=(0, 0, -1)).offset(ESTRUSIONE_ESTRUSIONE5_START)):
        with Locations(Location((-119.182675389, 109.451342845, 0), (0, 0, 180))):
            Circle(SCHIZZO13_R)
        with Locations((-119.182675389, 109.451342845)):
            Circle(SCHIZZO13_R_2, mode=Mode.SUBTRACT)
    extrude(amount=ESTRUSIONE_ESTRUSIONE5_DEPTH)

    # Schizzo15 → Taglio-Estrusione4 (cut)
    with BuildSketch(Plane(origin=(0, 0, 0), x_dir=(-1, 0, 0), z_dir=(0, 0, -1))):
        with Locations((-271.682675389, 159.346140283)):
            Circle(SCHIZZO15_R)
        with Locations((3.656902199, 146.346140283)):
            Circle(SCHIZZO15_R)
    extrude(amount=-TAGLIO_ESTRUSIONE4_DEPTH, mode=Mode.SUBTRACT)

    # Raccordo4
    raccordo4_edges = [part.edges().sort_by_distance(p)[0] for p in [
        (264.182675389, 206.720091138, 21.5),
        (264.182675389, 138.620905818, 21.5),
        (38.898311054, 373.451342845, 24),
        (13.652120373, 359.275490486, 24),
        (2.182675389, 290.55315197, 24),
        (2.182675389, 160.451631766, 24),
        (17.744303444, 32.512849195, 24),
        (41.724902169, 5.451342845, 24),
        (178.417565472, 5.451342845, 24),
        (252.98547965, 71.529823638, 24),
        (251.63003789, 309.920678761, 24),
        (238.892279388, 339.875503756, 24),
        (190.502060744, 373.451342845, 24),
    ]]
    fillet(raccordo4_edges, radius=RACCORDO4_R)

    # Foro filettato M20x1.5-1
    with Locations(Plane(origin=(60, 388.451342845, 30), x_dir=(1, 0, 0), z_dir=(0, 1, 0))):
        with Locations((0, 0)):
            CounterSinkHole(FORO_FILETTATO_M20X1_5_1_D / 2, FORO_FILETTATO_M20X1_5_1_CSINK_D / 2, depth=FORO_FILETTATO_M20X1_5_1_DEPTH, counter_sink_angle=FORO_FILETTATO_M20X1_5_1_CSINK_ANGLE)
            with Locations((0, 0, -(FORO_FILETTATO_M20X1_5_1_DEPTH + FORO_FILETTATO_M20X1_5_1_TIP / 2))):  # 118° drill point
                Cone(0, FORO_FILETTATO_M20X1_5_1_D / 2, FORO_FILETTATO_M20X1_5_1_TIP, mode=Mode.SUBTRACT)

    # Foro filettato G1/2-1
    with Locations(Plane(origin=(-0.956356831, 62.0286549, 30), x_dir=(0.120743490307, -0.992683740951, 0), z_dir=(-0.992683740951, -0.120743490307, 0))):
        with Locations((0, 0)):
            CounterSinkHole(FORO_FILETTATO_G1_2_1_D / 2, FORO_FILETTATO_G1_2_1_CSINK_D / 2, depth=FORO_FILETTATO_G1_2_1_DEPTH, counter_sink_angle=FORO_FILETTATO_G1_2_1_CSINK_ANGLE)

    # Foro filettato M20x1.5-3 (through all)
    with Locations(Plane(origin=(60, -9.548657155, 30), x_dir=(0, 0, -1), z_dir=(0, -1, 0))):
        with Locations((0, 0)):
            CounterSinkHole(FORO_FILETTATO_M20X1_5_3_D / 2, FORO_FILETTATO_M20X1_5_3_CSINK_D / 2, counter_sink_angle=FORO_FILETTATO_M20X1_5_3_CSINK_ANGLE)

    # Raccordo6
    raccordo6_edges = [part.edges().sort_by_distance(p)[0] for p in [
        (258.392726649, 103.928833287, 48),
        (215.891696552, 38.659106238, 48),
        (110.777863912, 5.451342845, 48),
        (28.816591049, 20.018049346, 48),
        (9.660453104, 98.973631277, 48),
        (2.182675389, 225.279580054, 48),
        (7.26491922, 321.004815623, 48),
        (28.17331692, 367.429209236, 48),
        (114.186150111, 373.451342845, 48),
        (214.896310208, 356.525248737, 48),
        (245.837442031, 323.542871017, 48),
        (257.309269397, 263.229293872, 48),
        (238.258720659, 339.359874184, 48),
        (251.437728609, 309.869200406, 48),
        (190.216383812, 372.538492669, 48),
        (39.068541411, 372.800483155, 48),
        (15.434514295, 358.023716898, 48),
        (2.251005579, 290.547489134, 48),
        (2.2192902, 160.453850382, 48),
        (18.608965239, 32.902176891, 48),
        (42.517542626, 7.212819538, 48),
        (177.924395815, 6.75147287, 48),
        (251.921923958, 72.118504243, 48),
    ]]
    fillet(raccordo6_edges, radius=RACCORDO6_R)

    # Schizzo24 → Taglio-Estrusione8 (cut)
    with BuildSketch(Plane.XY.offset(77)):
        with Locations((136.251620643, 185.923071566)):
            Rectangle(SCHIZZO24_W, SCHIZZO24_H)
    extrude(amount=-TAGLIO_ESTRUSIONE8_DEPTH, mode=Mode.SUBTRACT)


solid = part.part
